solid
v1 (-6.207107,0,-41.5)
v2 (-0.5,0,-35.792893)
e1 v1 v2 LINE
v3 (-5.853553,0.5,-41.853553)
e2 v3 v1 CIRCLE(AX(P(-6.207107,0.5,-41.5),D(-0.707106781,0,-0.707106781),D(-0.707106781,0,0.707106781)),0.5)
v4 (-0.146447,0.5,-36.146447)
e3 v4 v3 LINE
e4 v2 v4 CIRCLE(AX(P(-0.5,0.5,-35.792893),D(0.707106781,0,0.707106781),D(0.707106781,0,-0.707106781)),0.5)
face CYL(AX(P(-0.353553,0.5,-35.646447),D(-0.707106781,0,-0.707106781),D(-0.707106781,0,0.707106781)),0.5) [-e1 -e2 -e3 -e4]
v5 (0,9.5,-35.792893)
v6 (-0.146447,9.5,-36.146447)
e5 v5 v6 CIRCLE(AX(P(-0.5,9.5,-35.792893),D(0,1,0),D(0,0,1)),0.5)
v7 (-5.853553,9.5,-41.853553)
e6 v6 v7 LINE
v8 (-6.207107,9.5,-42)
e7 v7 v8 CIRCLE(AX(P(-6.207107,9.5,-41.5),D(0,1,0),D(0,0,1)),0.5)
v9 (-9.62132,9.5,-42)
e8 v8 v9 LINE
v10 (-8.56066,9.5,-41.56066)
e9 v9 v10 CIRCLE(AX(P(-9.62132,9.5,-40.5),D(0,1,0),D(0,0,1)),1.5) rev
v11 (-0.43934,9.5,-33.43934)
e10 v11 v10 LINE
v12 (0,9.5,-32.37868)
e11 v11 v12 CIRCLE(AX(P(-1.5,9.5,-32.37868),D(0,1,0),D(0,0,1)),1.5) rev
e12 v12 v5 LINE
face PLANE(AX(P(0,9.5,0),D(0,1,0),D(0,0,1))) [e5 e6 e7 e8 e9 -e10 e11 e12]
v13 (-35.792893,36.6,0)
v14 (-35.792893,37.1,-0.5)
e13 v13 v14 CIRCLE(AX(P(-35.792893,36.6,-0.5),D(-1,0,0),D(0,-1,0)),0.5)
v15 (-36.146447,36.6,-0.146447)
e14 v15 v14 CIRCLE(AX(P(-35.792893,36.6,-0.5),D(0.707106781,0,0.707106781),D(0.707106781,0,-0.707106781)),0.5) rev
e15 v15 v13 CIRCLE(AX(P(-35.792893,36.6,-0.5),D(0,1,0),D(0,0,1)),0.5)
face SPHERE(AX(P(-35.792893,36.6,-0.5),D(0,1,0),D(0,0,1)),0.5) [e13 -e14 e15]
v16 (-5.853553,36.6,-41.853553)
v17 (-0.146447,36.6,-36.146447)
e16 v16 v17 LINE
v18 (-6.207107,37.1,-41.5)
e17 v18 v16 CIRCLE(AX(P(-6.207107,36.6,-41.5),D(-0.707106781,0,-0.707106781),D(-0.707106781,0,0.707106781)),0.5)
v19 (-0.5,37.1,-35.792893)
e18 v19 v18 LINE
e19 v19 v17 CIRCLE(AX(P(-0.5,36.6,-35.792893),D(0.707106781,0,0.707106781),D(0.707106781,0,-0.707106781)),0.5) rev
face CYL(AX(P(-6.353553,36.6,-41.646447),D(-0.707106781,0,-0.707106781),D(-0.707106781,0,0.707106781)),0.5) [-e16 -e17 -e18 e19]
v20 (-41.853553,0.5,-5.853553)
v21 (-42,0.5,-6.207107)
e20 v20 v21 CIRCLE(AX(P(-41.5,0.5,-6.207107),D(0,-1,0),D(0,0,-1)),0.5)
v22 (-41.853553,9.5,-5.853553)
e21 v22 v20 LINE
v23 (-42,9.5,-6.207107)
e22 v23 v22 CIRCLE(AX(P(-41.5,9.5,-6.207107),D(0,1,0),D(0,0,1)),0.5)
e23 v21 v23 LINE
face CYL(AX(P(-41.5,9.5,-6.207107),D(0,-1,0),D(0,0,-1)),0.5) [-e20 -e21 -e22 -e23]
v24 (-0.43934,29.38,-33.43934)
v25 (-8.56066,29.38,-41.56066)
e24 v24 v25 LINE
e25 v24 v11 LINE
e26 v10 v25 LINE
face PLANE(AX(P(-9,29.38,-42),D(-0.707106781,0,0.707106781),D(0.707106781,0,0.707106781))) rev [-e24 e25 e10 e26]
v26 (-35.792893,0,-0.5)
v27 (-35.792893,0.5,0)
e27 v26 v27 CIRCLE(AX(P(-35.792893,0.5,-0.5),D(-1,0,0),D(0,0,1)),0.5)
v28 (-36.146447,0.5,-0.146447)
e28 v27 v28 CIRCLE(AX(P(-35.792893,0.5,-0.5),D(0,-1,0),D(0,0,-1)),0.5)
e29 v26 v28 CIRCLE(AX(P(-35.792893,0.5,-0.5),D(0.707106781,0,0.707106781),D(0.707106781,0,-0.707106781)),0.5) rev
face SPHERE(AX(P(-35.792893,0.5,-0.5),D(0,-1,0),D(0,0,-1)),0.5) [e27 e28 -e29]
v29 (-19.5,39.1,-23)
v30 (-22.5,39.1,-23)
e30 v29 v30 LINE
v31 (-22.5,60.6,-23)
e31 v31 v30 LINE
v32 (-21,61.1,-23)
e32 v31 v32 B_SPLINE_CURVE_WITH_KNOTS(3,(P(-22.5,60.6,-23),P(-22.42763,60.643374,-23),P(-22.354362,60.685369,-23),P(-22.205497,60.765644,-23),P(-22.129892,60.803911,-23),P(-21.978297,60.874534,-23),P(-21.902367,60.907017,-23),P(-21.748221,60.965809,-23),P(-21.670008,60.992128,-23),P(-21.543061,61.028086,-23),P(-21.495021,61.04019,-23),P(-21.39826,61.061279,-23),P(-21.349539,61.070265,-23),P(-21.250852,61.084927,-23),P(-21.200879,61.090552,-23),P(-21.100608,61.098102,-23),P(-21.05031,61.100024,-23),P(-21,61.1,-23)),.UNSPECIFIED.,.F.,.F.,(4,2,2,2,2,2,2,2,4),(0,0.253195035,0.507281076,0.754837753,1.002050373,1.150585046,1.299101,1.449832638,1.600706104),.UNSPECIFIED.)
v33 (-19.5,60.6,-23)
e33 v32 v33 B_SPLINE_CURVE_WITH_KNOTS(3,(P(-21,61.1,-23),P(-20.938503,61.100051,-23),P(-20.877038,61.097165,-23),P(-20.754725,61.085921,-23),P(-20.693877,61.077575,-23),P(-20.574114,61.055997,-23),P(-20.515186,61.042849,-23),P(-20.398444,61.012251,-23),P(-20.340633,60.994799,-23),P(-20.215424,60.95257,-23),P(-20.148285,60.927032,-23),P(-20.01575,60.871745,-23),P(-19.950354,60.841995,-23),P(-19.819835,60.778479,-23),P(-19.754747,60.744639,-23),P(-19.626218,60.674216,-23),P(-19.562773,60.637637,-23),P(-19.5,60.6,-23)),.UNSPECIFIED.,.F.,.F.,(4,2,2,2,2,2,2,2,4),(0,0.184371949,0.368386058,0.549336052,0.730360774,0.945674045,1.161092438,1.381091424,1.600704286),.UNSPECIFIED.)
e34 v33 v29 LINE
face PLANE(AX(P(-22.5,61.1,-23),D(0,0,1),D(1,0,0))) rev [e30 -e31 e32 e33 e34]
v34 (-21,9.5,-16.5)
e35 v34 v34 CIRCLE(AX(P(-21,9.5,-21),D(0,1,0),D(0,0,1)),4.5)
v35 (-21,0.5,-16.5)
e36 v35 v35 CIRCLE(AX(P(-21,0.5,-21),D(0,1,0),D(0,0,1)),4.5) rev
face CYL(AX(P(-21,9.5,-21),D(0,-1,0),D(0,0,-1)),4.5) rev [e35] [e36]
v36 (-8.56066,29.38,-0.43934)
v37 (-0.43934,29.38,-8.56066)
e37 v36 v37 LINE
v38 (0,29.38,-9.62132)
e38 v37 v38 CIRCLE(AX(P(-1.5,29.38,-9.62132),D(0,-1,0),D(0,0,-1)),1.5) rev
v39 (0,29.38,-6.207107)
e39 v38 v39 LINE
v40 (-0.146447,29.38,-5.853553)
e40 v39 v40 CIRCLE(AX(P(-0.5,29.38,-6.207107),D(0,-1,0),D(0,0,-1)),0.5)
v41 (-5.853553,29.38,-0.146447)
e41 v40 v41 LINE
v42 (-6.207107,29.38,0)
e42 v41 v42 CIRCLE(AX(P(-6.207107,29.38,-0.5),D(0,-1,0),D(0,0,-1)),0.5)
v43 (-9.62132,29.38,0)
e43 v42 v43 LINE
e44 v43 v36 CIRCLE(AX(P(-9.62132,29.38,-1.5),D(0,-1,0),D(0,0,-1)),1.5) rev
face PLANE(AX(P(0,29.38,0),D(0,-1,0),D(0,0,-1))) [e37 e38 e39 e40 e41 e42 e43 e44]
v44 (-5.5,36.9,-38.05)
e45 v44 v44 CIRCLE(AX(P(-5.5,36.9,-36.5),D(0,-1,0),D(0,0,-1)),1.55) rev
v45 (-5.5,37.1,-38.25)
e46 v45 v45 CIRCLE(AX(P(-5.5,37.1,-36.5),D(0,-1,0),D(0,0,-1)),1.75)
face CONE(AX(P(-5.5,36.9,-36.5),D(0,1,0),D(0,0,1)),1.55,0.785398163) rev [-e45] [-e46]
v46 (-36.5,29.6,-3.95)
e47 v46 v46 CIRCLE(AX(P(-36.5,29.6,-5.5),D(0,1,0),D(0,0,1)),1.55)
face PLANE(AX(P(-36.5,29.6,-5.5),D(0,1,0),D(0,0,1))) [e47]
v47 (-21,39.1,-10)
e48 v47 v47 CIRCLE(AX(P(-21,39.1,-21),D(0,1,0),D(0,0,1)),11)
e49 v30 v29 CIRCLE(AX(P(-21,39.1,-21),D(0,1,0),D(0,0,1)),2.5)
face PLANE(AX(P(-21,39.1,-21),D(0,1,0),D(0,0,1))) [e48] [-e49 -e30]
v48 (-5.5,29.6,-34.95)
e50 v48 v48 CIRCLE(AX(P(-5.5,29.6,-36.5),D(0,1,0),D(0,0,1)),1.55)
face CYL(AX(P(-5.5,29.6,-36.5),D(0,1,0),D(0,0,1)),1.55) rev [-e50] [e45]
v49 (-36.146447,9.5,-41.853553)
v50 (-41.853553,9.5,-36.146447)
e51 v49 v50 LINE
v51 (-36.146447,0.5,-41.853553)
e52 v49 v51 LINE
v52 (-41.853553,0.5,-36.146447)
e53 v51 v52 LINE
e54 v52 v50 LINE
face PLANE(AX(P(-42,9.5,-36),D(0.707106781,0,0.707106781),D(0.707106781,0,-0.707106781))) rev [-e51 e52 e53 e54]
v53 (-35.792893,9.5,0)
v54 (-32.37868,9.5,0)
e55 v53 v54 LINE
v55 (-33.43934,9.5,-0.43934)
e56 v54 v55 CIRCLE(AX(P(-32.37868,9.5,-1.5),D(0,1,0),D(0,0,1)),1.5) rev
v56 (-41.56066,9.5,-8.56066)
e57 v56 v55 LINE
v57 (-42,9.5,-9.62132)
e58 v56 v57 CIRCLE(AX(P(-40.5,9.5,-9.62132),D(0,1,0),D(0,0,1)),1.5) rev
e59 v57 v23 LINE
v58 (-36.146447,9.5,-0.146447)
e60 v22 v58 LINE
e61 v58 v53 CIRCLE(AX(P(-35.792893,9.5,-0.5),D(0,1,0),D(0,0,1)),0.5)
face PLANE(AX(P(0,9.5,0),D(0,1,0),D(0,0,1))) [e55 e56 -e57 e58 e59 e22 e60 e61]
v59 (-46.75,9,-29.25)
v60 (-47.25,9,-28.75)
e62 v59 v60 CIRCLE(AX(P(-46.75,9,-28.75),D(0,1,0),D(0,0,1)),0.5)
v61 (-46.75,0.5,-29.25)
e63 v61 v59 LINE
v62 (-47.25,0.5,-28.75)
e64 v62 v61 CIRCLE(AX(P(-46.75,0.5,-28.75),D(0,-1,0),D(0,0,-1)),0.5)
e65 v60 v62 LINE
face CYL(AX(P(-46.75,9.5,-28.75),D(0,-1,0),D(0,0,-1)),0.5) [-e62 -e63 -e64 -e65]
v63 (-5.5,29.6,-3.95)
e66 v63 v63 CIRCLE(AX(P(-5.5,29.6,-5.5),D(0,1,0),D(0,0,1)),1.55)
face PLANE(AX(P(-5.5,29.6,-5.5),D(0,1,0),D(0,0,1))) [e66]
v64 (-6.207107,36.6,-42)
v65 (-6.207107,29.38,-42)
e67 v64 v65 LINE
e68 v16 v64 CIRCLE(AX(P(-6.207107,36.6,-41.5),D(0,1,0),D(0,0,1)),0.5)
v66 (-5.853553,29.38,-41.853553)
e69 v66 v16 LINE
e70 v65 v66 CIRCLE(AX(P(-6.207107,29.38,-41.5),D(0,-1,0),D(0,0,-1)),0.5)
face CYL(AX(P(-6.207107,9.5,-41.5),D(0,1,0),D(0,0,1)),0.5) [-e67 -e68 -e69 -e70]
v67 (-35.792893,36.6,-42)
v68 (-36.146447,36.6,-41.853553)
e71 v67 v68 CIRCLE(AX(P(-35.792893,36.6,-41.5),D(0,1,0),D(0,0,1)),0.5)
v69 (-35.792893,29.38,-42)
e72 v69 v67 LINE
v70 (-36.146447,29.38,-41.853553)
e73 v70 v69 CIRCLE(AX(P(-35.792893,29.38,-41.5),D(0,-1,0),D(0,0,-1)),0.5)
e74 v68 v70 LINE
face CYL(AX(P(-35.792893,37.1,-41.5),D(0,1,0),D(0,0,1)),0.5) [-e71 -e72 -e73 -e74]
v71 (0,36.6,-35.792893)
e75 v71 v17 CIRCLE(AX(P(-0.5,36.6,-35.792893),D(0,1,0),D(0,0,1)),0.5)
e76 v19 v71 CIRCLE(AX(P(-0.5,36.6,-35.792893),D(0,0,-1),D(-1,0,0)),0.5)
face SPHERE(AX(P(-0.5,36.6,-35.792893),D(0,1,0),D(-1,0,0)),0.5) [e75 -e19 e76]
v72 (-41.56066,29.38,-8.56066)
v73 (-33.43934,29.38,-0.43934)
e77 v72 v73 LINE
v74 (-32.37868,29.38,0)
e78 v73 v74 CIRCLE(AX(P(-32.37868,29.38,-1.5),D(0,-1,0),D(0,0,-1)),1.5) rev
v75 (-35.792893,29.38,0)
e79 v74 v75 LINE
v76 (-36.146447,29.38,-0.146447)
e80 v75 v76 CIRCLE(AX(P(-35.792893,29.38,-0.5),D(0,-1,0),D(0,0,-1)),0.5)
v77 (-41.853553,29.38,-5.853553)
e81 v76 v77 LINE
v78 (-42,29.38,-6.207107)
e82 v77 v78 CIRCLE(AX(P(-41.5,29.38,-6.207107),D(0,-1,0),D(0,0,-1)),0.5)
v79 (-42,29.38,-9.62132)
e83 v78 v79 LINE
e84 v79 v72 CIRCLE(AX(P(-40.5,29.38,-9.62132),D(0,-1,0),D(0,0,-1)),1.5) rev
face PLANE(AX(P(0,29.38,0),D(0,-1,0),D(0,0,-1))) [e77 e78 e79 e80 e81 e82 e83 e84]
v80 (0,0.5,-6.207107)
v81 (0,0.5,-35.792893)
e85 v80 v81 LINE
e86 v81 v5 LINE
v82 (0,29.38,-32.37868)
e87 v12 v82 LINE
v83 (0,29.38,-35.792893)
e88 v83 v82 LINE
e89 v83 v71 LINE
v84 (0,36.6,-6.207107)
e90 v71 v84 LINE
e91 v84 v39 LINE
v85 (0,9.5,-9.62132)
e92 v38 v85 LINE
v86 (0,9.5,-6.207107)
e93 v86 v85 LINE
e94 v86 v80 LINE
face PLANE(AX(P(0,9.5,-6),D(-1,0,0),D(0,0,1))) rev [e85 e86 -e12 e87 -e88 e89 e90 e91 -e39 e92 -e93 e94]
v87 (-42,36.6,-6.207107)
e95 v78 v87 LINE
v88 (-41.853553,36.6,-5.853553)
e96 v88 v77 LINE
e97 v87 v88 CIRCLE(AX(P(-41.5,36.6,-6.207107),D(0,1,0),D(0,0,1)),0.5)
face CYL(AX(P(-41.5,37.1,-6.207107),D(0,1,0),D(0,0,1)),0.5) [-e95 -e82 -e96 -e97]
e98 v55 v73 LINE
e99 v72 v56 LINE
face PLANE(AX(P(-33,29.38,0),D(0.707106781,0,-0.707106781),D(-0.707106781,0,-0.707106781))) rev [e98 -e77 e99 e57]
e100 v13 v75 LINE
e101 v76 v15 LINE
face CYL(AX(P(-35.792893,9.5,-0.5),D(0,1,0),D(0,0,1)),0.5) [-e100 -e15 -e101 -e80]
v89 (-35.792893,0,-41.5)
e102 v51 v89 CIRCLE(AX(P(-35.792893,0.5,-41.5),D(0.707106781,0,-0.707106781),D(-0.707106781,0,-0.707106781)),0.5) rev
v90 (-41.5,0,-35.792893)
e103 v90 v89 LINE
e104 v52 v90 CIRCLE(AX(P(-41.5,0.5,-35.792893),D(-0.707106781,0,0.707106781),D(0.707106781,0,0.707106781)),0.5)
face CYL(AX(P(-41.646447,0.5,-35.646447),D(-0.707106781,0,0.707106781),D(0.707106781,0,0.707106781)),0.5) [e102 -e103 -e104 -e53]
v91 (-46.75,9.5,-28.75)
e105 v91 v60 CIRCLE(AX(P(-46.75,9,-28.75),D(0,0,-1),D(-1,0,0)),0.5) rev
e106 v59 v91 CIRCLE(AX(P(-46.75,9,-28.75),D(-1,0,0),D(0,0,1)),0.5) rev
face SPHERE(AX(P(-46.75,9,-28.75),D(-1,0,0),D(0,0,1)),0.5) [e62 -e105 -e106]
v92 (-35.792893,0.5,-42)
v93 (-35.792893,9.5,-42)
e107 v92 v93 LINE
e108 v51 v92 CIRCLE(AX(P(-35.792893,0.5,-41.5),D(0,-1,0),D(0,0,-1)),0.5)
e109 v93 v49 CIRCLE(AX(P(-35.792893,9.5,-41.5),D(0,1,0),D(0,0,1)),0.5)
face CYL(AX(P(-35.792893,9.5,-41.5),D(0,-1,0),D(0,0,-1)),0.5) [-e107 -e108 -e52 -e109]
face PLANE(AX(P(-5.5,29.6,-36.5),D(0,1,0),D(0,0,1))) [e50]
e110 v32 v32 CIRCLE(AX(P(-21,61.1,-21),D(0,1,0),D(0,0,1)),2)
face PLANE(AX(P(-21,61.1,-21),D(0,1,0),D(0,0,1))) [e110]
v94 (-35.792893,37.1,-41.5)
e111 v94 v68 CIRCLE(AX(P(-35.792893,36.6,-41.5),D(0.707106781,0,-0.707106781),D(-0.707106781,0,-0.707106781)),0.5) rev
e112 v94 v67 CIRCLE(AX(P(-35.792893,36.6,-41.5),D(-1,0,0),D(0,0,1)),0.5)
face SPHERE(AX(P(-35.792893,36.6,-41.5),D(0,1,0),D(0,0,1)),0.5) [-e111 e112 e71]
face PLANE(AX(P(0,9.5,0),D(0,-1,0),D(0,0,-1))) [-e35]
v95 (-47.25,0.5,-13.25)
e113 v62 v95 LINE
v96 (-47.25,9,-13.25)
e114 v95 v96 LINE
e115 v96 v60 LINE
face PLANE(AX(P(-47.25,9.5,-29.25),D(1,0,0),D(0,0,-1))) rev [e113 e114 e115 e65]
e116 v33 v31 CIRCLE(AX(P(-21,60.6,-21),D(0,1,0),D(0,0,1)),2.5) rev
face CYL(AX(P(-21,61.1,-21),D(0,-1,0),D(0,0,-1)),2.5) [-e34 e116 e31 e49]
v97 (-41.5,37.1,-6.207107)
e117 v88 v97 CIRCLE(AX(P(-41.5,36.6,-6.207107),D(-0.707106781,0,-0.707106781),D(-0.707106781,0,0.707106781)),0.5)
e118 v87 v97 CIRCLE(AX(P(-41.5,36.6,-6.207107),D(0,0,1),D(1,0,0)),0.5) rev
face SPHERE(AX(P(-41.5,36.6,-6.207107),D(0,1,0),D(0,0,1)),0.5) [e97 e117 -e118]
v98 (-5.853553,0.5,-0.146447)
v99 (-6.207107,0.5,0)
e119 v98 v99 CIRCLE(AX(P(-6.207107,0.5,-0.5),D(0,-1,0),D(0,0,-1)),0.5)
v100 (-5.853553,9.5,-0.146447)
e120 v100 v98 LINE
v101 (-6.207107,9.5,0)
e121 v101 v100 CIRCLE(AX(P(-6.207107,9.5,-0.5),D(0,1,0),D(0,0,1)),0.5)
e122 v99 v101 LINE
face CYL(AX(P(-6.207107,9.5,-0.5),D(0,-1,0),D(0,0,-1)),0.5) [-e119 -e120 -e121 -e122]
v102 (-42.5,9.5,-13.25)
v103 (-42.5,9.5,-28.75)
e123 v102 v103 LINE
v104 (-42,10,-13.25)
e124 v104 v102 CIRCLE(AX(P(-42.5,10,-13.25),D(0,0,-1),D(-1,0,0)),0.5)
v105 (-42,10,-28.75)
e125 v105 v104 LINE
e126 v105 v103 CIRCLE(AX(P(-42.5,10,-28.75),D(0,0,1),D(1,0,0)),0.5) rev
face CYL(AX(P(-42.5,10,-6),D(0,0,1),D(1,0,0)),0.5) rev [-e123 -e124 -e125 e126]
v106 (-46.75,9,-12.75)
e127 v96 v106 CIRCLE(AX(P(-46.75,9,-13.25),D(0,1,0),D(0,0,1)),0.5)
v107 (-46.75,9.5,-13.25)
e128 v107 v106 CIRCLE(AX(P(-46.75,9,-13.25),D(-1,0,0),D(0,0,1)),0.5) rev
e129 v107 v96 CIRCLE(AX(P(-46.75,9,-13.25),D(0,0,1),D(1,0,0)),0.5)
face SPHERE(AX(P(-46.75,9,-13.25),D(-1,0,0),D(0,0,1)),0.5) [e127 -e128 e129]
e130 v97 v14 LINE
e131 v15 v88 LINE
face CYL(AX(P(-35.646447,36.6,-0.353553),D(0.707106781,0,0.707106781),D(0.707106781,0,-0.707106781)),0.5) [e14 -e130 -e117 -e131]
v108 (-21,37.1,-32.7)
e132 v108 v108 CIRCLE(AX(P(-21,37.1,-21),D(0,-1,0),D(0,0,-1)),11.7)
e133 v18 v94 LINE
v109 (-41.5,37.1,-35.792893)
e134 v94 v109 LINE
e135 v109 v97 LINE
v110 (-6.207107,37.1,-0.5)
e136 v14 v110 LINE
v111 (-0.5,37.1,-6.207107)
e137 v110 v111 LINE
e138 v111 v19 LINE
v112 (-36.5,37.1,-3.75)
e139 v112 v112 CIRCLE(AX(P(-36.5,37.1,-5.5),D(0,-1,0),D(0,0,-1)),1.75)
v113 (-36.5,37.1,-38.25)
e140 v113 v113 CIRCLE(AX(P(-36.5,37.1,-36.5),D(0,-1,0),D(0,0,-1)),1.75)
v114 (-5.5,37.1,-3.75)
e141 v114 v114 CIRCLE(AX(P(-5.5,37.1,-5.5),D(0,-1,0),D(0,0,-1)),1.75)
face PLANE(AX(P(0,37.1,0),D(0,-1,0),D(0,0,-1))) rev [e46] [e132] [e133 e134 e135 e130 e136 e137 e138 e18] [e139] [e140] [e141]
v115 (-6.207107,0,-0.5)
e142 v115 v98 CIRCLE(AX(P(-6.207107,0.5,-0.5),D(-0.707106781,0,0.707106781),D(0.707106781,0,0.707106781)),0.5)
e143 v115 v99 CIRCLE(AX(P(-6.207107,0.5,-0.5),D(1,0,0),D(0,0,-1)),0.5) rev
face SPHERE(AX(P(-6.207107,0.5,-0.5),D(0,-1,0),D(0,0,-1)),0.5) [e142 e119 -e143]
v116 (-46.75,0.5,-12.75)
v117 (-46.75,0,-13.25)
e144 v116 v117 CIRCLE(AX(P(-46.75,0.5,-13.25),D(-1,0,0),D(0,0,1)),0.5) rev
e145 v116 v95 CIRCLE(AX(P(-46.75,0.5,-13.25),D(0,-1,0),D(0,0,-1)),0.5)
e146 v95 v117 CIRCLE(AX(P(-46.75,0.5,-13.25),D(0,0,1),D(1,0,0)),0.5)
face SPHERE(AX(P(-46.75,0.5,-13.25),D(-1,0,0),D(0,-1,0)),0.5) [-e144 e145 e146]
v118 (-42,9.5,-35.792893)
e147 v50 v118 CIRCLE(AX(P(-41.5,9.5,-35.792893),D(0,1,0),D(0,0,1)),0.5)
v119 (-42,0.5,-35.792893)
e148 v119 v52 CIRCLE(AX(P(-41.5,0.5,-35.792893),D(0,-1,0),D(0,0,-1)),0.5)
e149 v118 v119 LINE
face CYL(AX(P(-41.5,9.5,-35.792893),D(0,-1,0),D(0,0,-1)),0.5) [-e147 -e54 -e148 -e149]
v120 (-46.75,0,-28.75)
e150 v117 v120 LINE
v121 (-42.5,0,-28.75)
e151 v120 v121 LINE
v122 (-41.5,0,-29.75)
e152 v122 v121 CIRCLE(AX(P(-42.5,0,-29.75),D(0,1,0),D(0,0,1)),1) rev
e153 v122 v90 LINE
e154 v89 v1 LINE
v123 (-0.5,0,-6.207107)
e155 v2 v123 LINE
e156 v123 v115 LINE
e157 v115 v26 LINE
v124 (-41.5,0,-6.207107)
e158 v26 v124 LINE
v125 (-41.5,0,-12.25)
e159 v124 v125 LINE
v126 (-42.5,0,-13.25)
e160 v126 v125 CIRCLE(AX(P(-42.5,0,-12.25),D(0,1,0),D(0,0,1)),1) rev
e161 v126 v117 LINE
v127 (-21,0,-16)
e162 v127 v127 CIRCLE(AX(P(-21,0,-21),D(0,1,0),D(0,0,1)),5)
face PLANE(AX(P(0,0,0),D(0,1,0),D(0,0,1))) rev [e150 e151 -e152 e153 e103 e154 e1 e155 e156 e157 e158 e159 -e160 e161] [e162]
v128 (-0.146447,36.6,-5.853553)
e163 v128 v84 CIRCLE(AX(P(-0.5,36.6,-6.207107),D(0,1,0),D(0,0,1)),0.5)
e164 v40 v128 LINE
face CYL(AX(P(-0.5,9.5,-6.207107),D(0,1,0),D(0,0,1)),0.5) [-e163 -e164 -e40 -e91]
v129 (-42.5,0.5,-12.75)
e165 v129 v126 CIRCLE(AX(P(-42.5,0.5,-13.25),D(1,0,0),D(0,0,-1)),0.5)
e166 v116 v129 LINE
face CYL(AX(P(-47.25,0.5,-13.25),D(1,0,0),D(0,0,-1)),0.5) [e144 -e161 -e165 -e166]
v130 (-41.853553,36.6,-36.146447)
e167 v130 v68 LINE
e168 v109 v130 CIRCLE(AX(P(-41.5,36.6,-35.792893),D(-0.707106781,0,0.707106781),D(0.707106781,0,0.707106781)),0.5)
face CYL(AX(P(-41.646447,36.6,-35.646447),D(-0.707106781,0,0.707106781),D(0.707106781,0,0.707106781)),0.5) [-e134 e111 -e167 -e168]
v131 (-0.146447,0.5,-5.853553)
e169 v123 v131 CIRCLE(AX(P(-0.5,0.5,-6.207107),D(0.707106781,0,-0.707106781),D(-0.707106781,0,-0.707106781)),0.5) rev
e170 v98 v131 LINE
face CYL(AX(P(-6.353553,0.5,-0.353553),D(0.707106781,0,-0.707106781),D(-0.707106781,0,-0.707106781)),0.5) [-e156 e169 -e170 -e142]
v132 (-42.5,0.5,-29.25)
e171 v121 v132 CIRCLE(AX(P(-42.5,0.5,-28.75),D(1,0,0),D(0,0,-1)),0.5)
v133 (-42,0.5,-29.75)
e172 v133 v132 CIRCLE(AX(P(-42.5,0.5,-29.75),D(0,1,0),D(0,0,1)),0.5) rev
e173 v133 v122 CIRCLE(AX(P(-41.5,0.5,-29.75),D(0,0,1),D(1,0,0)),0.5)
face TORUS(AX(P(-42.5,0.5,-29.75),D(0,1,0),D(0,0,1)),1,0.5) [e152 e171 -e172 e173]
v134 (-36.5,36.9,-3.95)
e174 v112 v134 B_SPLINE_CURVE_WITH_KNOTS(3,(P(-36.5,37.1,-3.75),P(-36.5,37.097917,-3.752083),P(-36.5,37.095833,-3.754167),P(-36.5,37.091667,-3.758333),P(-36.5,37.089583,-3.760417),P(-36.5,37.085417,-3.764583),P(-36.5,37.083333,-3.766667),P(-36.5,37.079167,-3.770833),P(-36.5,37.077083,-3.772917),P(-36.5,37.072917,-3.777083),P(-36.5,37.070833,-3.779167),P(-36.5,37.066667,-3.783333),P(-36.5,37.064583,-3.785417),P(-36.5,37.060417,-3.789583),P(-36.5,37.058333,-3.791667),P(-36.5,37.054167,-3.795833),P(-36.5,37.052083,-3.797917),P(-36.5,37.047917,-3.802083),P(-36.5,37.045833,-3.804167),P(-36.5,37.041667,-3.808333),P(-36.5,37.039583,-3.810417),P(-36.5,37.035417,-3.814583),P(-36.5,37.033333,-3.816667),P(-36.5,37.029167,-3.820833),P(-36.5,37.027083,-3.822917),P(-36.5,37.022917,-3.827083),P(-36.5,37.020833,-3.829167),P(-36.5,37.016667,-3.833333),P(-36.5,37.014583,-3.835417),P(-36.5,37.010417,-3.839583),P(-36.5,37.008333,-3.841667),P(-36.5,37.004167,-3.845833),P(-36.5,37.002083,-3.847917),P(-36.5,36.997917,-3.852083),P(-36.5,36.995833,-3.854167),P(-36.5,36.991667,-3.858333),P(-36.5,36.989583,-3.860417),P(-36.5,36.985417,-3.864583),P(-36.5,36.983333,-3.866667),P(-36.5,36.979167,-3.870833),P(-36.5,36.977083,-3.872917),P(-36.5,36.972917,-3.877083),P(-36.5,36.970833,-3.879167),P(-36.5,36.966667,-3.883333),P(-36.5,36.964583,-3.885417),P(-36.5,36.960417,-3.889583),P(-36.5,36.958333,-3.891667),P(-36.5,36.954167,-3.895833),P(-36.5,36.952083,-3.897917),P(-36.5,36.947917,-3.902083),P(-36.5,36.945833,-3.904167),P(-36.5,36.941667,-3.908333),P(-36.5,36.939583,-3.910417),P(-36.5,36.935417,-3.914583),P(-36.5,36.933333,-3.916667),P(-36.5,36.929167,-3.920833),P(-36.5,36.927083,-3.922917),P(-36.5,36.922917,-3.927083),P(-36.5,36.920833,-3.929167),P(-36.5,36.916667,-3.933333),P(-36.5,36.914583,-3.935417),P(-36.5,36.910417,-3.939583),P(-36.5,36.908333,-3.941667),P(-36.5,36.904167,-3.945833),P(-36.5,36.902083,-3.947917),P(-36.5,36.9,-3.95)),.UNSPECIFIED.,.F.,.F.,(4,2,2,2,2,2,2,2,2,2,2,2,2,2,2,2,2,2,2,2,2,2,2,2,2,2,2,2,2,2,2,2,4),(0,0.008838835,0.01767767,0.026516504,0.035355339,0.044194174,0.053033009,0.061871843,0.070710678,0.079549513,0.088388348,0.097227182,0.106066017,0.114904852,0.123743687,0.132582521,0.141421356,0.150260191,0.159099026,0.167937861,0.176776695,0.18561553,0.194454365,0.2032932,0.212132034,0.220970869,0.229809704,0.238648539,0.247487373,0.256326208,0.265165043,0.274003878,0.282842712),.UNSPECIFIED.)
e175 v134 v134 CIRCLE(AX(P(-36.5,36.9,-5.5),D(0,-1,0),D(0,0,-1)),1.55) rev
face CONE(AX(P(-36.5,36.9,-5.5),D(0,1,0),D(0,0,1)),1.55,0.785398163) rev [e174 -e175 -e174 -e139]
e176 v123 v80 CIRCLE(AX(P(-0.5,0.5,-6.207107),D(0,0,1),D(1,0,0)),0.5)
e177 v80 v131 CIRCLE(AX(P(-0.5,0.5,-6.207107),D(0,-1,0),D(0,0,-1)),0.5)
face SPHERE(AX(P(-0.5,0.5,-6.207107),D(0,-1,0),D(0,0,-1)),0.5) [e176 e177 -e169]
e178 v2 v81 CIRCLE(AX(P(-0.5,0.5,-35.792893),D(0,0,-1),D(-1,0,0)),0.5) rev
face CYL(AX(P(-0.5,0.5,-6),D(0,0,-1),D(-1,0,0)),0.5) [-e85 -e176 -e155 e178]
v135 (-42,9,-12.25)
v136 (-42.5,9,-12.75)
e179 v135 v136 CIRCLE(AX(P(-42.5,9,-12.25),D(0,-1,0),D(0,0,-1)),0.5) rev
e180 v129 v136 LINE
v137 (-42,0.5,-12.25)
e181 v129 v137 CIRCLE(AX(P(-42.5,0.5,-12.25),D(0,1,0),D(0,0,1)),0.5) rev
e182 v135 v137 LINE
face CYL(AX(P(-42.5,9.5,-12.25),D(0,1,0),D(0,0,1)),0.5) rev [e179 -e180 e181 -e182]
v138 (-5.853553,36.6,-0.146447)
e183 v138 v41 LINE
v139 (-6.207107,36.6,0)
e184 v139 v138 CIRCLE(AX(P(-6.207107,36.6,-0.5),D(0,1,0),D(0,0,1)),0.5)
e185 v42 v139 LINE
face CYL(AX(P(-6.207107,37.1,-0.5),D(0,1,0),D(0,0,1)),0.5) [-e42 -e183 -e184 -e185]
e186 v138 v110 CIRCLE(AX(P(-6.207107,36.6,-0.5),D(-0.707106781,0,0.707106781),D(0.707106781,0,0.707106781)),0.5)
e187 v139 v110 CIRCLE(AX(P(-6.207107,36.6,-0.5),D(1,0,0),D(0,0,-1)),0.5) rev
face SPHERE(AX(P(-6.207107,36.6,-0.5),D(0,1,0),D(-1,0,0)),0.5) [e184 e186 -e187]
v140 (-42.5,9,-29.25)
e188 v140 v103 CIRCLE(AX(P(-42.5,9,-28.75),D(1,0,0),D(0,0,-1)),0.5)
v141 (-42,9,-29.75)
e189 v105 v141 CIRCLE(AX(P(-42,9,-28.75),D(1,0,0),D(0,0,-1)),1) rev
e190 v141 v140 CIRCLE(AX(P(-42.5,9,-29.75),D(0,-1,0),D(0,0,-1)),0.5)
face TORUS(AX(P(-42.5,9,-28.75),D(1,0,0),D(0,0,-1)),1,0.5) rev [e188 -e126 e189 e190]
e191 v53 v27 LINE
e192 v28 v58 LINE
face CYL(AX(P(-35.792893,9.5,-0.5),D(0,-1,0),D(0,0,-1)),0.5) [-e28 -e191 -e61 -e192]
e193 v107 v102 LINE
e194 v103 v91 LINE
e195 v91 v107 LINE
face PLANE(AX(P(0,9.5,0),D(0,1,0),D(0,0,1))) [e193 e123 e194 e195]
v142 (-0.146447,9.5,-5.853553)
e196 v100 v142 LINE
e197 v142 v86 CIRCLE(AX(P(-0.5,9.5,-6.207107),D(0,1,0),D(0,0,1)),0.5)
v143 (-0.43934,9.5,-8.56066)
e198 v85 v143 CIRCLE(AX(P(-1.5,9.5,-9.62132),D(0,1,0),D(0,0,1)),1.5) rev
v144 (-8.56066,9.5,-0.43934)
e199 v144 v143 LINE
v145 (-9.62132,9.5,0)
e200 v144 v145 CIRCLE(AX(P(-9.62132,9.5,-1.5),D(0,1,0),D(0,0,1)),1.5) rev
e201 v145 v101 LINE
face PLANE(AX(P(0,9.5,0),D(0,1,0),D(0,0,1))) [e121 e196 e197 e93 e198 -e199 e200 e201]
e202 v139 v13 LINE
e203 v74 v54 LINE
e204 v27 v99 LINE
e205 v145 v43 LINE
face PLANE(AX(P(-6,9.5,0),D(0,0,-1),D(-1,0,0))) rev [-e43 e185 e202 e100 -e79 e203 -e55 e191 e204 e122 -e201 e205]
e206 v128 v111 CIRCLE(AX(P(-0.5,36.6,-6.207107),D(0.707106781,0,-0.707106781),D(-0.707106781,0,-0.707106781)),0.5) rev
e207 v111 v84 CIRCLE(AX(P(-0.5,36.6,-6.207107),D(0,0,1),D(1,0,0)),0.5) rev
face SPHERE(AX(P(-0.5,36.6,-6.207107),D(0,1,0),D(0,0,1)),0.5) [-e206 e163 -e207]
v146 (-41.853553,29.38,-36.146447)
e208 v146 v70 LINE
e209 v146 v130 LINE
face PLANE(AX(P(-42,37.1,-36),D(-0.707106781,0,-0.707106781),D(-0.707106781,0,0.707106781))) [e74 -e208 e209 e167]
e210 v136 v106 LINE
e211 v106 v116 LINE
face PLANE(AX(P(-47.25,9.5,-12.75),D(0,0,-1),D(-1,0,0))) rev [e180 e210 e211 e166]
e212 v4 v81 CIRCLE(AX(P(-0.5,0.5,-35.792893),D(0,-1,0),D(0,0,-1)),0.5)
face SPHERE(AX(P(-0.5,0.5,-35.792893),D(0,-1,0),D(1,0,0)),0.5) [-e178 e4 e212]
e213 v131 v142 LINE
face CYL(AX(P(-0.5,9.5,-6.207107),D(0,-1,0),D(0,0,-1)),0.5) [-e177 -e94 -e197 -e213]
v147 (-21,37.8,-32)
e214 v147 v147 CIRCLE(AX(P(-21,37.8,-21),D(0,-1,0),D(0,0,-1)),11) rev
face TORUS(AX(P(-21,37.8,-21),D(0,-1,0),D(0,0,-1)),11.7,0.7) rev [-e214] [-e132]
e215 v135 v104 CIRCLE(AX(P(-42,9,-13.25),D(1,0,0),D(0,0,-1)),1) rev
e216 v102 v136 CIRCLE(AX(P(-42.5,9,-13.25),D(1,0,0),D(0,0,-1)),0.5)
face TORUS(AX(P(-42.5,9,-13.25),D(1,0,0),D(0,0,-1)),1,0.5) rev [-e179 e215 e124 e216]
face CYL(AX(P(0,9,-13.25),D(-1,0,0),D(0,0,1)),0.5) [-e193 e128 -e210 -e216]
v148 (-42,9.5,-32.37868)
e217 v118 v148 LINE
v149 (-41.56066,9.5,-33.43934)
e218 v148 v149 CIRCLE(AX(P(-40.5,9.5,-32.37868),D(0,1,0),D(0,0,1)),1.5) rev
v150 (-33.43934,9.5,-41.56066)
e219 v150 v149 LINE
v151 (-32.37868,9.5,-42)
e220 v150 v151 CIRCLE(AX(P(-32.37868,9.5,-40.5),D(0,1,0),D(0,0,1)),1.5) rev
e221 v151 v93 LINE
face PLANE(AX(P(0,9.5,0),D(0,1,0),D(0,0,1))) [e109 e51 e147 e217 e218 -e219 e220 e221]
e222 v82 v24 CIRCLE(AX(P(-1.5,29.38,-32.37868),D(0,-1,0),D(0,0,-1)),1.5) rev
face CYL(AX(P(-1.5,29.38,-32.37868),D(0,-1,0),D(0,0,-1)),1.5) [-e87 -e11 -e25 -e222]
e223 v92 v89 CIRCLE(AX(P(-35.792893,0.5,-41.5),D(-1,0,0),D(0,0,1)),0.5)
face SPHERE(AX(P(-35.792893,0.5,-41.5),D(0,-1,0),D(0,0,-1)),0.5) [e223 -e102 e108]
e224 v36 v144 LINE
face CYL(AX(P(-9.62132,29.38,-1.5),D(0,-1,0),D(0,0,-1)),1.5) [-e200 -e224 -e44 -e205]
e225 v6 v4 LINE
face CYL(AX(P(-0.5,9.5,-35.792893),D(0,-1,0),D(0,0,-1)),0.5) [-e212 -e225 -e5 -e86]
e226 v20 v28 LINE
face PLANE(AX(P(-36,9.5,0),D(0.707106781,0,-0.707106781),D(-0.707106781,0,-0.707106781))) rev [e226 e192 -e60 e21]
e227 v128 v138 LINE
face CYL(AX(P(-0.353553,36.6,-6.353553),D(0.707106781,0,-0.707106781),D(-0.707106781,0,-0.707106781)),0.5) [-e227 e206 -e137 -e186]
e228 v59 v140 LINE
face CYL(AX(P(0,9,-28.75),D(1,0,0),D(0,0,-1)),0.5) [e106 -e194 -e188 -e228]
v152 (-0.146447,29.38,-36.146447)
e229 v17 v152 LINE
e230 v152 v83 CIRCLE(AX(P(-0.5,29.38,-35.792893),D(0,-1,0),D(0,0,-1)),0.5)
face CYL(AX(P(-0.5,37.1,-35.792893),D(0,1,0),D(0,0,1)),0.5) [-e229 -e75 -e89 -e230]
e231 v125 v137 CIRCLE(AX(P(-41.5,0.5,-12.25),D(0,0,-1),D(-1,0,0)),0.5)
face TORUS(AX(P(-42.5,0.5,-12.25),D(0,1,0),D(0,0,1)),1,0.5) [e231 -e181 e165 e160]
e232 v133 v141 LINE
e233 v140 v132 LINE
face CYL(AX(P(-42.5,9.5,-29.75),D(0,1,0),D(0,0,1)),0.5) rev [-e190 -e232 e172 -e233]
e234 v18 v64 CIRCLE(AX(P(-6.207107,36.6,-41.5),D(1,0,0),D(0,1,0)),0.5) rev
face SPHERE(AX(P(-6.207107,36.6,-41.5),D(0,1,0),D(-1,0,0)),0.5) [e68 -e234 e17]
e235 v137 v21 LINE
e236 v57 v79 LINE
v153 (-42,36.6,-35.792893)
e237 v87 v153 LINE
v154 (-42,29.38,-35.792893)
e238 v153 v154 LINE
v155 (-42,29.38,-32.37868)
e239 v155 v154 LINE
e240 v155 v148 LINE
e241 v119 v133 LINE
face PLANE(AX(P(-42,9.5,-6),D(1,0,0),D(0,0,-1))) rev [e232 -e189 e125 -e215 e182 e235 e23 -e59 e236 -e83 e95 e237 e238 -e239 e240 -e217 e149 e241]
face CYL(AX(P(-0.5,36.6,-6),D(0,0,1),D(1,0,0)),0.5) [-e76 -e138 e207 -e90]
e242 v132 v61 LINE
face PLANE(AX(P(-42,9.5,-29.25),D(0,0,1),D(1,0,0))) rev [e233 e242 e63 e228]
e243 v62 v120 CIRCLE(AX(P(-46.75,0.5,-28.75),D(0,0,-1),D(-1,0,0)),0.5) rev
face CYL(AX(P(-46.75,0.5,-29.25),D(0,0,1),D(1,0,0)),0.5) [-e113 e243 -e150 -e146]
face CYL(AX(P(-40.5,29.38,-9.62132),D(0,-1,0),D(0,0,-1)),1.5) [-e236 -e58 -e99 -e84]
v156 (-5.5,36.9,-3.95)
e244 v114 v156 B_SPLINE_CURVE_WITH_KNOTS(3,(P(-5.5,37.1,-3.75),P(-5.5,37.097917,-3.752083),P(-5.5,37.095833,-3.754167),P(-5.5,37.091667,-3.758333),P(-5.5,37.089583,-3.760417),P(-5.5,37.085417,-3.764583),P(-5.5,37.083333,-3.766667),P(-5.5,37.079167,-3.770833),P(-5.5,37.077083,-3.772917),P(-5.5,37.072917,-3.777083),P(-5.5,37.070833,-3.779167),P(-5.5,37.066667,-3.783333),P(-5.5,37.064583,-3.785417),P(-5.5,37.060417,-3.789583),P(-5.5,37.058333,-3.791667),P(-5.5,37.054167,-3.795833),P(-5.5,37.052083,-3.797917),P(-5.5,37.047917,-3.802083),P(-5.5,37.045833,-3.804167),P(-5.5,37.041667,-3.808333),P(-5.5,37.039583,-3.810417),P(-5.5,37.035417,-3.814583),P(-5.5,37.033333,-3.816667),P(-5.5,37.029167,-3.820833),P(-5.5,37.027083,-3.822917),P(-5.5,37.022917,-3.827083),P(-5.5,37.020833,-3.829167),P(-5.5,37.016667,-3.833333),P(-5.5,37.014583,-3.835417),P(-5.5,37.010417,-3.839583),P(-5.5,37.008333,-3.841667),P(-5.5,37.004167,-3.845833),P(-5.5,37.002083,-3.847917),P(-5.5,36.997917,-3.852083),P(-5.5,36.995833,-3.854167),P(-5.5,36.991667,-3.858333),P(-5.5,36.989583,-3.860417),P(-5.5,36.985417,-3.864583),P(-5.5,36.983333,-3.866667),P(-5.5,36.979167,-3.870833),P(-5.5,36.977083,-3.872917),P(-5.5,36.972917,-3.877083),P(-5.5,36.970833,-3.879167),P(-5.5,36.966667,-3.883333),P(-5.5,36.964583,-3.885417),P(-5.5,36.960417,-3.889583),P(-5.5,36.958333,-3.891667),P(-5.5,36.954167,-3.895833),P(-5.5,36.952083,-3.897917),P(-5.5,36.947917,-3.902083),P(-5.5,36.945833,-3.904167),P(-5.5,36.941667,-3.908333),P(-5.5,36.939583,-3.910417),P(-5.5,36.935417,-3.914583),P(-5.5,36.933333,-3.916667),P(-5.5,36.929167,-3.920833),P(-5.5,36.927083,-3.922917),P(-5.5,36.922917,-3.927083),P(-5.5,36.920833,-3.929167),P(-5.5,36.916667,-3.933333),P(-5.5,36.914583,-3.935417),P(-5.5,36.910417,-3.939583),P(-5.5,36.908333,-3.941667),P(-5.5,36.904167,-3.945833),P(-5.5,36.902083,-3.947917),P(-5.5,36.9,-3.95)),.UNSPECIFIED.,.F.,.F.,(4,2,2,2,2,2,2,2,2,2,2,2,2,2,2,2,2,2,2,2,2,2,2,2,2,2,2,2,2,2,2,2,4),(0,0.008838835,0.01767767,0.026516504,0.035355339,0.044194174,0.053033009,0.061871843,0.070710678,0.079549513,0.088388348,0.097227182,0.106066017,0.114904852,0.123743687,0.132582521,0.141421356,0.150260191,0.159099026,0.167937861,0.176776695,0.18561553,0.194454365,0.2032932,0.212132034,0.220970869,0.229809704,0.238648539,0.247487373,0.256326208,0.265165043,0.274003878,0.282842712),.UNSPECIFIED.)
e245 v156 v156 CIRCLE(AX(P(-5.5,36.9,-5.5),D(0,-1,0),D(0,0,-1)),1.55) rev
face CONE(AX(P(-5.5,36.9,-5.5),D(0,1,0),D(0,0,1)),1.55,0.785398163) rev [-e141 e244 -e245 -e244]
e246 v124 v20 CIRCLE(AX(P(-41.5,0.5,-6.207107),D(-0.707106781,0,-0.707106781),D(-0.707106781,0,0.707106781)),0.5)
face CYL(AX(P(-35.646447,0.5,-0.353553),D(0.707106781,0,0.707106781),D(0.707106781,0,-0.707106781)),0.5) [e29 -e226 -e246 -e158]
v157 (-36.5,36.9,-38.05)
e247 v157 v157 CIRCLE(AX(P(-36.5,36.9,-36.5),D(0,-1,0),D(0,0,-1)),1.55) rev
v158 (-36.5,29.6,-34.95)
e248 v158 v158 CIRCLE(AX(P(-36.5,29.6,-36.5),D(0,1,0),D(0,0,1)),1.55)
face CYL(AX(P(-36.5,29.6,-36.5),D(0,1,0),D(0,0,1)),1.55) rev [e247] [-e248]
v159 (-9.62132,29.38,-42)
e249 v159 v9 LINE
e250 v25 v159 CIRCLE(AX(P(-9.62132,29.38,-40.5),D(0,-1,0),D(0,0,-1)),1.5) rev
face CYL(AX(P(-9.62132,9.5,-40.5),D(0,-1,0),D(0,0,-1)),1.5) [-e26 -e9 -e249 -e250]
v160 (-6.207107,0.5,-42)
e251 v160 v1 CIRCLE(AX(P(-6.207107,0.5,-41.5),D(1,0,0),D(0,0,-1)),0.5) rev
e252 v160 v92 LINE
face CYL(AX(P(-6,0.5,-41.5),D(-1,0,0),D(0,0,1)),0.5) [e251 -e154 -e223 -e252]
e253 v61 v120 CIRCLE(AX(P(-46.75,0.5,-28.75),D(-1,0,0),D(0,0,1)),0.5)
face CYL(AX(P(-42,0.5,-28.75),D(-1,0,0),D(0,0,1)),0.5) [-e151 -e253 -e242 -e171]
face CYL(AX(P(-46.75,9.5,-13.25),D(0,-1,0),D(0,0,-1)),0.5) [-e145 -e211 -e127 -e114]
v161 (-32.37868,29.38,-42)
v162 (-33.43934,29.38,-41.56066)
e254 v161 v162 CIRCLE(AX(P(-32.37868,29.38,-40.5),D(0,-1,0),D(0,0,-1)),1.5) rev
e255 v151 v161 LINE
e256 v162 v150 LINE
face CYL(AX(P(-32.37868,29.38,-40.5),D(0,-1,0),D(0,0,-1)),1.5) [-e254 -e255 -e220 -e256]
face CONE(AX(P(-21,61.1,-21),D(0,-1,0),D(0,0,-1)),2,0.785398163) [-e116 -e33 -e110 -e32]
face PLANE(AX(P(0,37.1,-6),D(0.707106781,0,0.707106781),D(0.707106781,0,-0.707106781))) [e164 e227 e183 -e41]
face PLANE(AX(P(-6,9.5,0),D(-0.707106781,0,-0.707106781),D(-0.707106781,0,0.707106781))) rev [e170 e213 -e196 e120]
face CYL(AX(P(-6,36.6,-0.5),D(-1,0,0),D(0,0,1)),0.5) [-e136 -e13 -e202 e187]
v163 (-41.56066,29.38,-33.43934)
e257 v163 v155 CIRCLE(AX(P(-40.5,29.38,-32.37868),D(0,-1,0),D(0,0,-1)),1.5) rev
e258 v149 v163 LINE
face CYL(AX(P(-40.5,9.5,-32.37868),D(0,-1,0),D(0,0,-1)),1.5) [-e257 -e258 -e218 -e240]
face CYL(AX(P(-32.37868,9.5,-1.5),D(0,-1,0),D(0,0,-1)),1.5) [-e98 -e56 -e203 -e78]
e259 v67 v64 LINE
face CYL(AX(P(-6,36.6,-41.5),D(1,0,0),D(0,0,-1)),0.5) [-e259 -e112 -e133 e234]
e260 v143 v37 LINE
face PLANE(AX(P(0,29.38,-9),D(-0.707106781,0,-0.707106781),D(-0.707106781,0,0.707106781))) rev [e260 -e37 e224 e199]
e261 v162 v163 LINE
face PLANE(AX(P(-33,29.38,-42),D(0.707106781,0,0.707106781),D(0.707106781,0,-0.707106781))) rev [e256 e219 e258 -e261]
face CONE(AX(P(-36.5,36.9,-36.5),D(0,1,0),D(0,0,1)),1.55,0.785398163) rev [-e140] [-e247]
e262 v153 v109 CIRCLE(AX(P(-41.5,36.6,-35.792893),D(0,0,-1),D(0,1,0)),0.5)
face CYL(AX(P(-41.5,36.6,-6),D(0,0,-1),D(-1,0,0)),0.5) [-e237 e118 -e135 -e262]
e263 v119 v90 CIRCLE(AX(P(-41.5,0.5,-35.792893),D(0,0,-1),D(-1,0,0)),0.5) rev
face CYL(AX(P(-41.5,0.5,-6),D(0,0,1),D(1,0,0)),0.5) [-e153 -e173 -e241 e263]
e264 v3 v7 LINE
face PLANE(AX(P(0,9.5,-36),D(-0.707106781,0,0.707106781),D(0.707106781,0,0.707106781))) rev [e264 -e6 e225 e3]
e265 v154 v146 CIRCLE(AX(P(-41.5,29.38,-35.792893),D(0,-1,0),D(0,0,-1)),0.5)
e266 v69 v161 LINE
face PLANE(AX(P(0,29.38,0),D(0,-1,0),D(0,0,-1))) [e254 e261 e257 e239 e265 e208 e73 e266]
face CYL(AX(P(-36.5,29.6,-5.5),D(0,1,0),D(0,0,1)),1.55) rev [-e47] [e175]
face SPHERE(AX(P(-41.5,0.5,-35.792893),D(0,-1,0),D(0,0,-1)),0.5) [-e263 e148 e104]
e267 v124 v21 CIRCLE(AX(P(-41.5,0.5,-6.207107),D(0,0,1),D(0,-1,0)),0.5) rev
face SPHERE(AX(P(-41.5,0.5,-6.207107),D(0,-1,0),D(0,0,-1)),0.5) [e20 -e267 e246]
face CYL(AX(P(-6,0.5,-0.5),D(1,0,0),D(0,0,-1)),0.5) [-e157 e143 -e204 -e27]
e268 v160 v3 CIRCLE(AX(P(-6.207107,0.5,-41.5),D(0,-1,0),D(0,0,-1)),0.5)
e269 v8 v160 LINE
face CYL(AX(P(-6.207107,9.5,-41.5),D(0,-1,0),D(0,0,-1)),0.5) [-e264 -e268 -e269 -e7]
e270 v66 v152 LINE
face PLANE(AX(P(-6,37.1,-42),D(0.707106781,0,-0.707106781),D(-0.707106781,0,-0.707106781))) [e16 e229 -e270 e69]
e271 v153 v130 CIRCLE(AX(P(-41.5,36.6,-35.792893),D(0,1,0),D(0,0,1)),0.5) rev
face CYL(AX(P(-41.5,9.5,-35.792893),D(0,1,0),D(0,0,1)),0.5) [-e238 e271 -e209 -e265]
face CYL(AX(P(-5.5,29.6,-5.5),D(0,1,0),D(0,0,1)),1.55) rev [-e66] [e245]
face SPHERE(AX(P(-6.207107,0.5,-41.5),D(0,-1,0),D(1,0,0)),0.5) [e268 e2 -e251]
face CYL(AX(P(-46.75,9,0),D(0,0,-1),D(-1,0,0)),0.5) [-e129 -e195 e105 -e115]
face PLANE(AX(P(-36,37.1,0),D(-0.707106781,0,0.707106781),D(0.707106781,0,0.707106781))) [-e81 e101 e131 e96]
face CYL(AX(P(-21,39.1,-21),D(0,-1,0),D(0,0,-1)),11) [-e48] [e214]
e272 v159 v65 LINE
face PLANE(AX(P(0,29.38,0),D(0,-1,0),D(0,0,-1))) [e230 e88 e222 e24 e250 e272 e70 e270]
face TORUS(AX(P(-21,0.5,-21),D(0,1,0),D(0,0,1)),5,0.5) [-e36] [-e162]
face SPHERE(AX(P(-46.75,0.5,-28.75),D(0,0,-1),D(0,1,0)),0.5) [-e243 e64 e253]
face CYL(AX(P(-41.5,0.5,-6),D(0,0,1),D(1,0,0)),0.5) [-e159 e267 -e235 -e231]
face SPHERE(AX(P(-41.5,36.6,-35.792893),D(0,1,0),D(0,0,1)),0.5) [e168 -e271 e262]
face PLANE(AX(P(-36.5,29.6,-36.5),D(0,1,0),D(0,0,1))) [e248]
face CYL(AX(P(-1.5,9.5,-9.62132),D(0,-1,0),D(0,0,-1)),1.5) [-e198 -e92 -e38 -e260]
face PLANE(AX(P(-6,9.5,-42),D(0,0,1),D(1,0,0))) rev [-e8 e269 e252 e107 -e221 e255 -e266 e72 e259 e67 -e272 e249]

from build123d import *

# Parameters (mm, degrees)
SKETCH1_R           = 4.5
BOSS_EXTRUDE1_DEPTH = 9.5
BOSS_EXTRUDE2_DEPTH = 19.88
BOSS_EXTRUDE3_DEPTH = 7.72
SKETCH5_R           = 1.55
CUT_EXTRUDE1_DEPTH  = 7.5
SKETCH6_R           = 11
BOSS_EXTRUDE4_DEPTH = 2
BOSS_EXTRUDE5_DEPTH = 22
CHAMFER1_SIZE       = 0.2
FILLET1_R           = 0.5
FILLET2_R           = 0.7
CHAMFER2_SIZE       = 0.5
FILLET3_R           = 1.5


with BuildPart() as part:
    # Sketch1 → Boss-Extrude1 (new body)
    with BuildSketch(Plane(origin=(0, 0, 0), x_dir=(1, 0, 0), z_dir=(0, 1, 0))):
        Polygon((-42, 36), (-36, 42), (-6, 42), (0, 36), (0, 6), (-6, 0), (-36, 0), (-42, 6), (-42, 12.75), (-47.25, 12.75), (-47.25, 29.25), (-42, 29.25), align=None)
        with Locations(Location((-21, 21, 0), (0, 0, 270))):
            Circle(SKETCH1_R, mode=Mode.SUBTRACT)
    extrude(amount=BOSS_EXTRUDE1_DEPTH)

    # Sketch2 → Boss-Extrude2 (add)
    with BuildSketch(Plane(origin=(0, 9.5, 0), x_dir=(1, 0, 0), z_dir=(0, 1, 0))):
        Polygon((-33, 42), (-9, 42), (0, 33), (0, 9), (-9, 0), (-33, 0), (-42, 9), (-42, 33), align=None)
    extrude(amount=BOSS_EXTRUDE2_DEPTH)

    # Sketch3 → Boss-Extrude3 (add)
    with BuildSketch(Plane(origin=(0, 29.38, 0), x_dir=(1, 0, 0), z_dir=(0, 1, 0))):
        Polygon((-42, 6), (-42, 36), (-36, 42), (-6, 42), (0, 36), (0, 6), (-6, 0), (-36, 0), align=None)
    extrude(amount=BOSS_EXTRUDE3_DEPTH)

    # Sketch5 → Cut-Extrude1 (cut)
    with BuildSketch(Plane(origin=(0, 37.1, 0), x_dir=(1, 0, 0), z_dir=(0, 1, 0))):
        with Locations(Location((-36.5, 5.5, 0), (0, 0, 270))):
            Circle(SKETCH5_R)
        with Locations(Location((-5.5, 36.5, 0), (0, 0, 270))):
            Circle(SKETCH5_R)
        with Locations(Location((-36.5, 36.5, 0), (0, 0, 270))):
            Circle(SKETCH5_R)
        with Locations(Location((-5.5, 5.5, 0), (0, 0, 270))):
            Circle(SKETCH5_R)
    extrude(amount=-CUT_EXTRUDE1_DEPTH, mode=Mode.SUBTRACT)

    # Sketch6 → Boss-Extrude4 (add)
    with BuildSketch(Plane(origin=(0, 37.1, 0), x_dir=(1, 0, 0), z_dir=(0, 1, 0))):
        with Locations(Location((-21, 21, 0), (0, 0, 270))):
            Circle(SKETCH6_R)
    extrude(amount=BOSS_EXTRUDE4_DEPTH)

    # Sketch7 → Boss-Extrude5 (add)
    with BuildSketch(Plane(origin=(0, 39.1, 0), x_dir=(1, 0, 0), z_dir=(0, 1, 0))):
        with BuildLine():
            Line((-22.5, 23), (-19.5, 23))
            ThreePointArc((-19.5, 23), (-21, 18.5), (-22.5, 23))
        make_face()
    extrude(amount=BOSS_EXTRUDE5_DEPTH)

    # Chamfer1
    chamfer1_edges = [part.edges().sort_by_distance(p)[0] for p in [
        (-5.5, 37.1, -38.05),
        (-36.5, 37.1, -7.05),
        (-5.5, 37.1, -7.05),
        (-36.5, 37.1, -38.05),
    ]]
    chamfer(chamfer1_edges, length=CHAMFER1_SIZE)

    # Fillet1
    fillet1_edges = [part.edges().sort_by_distance(p)[0] for p in [
        (-42, 4.75, -12.75),
        (-42, 4.75, -29.25),
        (-44.625, 9.5, -12.75),
        (-44.625, 9.5, -29.25),
        (-42, 9.5, -21),
        (-47.25, 4.75, -29.25),
        (-47.25, 9.5, -21),
        (-47.25, 4.75, -12.75),
        (-21, 0, -25.5),
        (-44.625, 0, -29.25),
        (-47.25, 0, -21),
        (-44.625, 0, -12.75),
        (-42, 0, -9.375),
        (-39, 0, -3),
        (-21, 0, 0),
        (-3, 0, -3),
        (0, 0, -21),
        (-3, 0, -39),
        (-21, 0, -42),
        (-39, 0, -39),
        (-42, 0, -32.625),
        (-6, 4.75, -42),
        (0, 4.75, -36),
        (-42, 4.75, -36),
        (-36, 4.75, -42),
        (0, 4.75, -6),
        (-6, 4.75, 0),
        (-36, 4.75, 0),
        (-42, 4.75, -6),
        (-42, 33.24, -36),
        (-39, 37.1, -39),
        (-36, 33.24, -42),
        (-21, 37.1, -42),
        (-6, 33.24, -42),
        (0, 33.24, -36),
        (0, 37.1, -21),
        (-3, 37.1, -39),
        (0, 33.24, -6),
        (-6, 33.24, 0),
        (-42, 33.24, -6),
        (-36, 33.24, 0),
        (-3, 37.1, -3),
        (-21, 37.1, 0),
        (-39, 37.1, -3),
        (-42, 37.1, -21),
    ]]
    fillet(fillet1_edges, radius=FILLET1_R)

    # Fillet2
    fillet2_edges = [part.edges().sort_by_distance(p)[0] for p in [
        (-21, 37.1, -32),
    ]]
    fillet(fillet2_edges, radius=FILLET2_R)

    # Chamfer2
    chamfer2_edges = [part.edges().sort_by_distance(p)[0] for p in [
        (-21, 61.1, -18.5),
    ]]
    chamfer(chamfer2_edges, length=CHAMFER2_SIZE - 0.0001)  # a hair under: the kernel refuses the full size

    # Fillet3
    fillet3_edges = [part.edges().sort_by_distance(p)[0] for p in [
        (-33, 19.44, -42),
        (-42, 19.44, -33),
        (-42, 19.44, -9),
        (-33, 19.44, 0),
        (-9, 19.44, 0),
        (0, 19.44, -9),
        (0, 19.44, -33),
        (-9, 19.44, -42),
    ]]
    fillet(fillet3_edges, radius=FILLET3_R)


solid = part.part
